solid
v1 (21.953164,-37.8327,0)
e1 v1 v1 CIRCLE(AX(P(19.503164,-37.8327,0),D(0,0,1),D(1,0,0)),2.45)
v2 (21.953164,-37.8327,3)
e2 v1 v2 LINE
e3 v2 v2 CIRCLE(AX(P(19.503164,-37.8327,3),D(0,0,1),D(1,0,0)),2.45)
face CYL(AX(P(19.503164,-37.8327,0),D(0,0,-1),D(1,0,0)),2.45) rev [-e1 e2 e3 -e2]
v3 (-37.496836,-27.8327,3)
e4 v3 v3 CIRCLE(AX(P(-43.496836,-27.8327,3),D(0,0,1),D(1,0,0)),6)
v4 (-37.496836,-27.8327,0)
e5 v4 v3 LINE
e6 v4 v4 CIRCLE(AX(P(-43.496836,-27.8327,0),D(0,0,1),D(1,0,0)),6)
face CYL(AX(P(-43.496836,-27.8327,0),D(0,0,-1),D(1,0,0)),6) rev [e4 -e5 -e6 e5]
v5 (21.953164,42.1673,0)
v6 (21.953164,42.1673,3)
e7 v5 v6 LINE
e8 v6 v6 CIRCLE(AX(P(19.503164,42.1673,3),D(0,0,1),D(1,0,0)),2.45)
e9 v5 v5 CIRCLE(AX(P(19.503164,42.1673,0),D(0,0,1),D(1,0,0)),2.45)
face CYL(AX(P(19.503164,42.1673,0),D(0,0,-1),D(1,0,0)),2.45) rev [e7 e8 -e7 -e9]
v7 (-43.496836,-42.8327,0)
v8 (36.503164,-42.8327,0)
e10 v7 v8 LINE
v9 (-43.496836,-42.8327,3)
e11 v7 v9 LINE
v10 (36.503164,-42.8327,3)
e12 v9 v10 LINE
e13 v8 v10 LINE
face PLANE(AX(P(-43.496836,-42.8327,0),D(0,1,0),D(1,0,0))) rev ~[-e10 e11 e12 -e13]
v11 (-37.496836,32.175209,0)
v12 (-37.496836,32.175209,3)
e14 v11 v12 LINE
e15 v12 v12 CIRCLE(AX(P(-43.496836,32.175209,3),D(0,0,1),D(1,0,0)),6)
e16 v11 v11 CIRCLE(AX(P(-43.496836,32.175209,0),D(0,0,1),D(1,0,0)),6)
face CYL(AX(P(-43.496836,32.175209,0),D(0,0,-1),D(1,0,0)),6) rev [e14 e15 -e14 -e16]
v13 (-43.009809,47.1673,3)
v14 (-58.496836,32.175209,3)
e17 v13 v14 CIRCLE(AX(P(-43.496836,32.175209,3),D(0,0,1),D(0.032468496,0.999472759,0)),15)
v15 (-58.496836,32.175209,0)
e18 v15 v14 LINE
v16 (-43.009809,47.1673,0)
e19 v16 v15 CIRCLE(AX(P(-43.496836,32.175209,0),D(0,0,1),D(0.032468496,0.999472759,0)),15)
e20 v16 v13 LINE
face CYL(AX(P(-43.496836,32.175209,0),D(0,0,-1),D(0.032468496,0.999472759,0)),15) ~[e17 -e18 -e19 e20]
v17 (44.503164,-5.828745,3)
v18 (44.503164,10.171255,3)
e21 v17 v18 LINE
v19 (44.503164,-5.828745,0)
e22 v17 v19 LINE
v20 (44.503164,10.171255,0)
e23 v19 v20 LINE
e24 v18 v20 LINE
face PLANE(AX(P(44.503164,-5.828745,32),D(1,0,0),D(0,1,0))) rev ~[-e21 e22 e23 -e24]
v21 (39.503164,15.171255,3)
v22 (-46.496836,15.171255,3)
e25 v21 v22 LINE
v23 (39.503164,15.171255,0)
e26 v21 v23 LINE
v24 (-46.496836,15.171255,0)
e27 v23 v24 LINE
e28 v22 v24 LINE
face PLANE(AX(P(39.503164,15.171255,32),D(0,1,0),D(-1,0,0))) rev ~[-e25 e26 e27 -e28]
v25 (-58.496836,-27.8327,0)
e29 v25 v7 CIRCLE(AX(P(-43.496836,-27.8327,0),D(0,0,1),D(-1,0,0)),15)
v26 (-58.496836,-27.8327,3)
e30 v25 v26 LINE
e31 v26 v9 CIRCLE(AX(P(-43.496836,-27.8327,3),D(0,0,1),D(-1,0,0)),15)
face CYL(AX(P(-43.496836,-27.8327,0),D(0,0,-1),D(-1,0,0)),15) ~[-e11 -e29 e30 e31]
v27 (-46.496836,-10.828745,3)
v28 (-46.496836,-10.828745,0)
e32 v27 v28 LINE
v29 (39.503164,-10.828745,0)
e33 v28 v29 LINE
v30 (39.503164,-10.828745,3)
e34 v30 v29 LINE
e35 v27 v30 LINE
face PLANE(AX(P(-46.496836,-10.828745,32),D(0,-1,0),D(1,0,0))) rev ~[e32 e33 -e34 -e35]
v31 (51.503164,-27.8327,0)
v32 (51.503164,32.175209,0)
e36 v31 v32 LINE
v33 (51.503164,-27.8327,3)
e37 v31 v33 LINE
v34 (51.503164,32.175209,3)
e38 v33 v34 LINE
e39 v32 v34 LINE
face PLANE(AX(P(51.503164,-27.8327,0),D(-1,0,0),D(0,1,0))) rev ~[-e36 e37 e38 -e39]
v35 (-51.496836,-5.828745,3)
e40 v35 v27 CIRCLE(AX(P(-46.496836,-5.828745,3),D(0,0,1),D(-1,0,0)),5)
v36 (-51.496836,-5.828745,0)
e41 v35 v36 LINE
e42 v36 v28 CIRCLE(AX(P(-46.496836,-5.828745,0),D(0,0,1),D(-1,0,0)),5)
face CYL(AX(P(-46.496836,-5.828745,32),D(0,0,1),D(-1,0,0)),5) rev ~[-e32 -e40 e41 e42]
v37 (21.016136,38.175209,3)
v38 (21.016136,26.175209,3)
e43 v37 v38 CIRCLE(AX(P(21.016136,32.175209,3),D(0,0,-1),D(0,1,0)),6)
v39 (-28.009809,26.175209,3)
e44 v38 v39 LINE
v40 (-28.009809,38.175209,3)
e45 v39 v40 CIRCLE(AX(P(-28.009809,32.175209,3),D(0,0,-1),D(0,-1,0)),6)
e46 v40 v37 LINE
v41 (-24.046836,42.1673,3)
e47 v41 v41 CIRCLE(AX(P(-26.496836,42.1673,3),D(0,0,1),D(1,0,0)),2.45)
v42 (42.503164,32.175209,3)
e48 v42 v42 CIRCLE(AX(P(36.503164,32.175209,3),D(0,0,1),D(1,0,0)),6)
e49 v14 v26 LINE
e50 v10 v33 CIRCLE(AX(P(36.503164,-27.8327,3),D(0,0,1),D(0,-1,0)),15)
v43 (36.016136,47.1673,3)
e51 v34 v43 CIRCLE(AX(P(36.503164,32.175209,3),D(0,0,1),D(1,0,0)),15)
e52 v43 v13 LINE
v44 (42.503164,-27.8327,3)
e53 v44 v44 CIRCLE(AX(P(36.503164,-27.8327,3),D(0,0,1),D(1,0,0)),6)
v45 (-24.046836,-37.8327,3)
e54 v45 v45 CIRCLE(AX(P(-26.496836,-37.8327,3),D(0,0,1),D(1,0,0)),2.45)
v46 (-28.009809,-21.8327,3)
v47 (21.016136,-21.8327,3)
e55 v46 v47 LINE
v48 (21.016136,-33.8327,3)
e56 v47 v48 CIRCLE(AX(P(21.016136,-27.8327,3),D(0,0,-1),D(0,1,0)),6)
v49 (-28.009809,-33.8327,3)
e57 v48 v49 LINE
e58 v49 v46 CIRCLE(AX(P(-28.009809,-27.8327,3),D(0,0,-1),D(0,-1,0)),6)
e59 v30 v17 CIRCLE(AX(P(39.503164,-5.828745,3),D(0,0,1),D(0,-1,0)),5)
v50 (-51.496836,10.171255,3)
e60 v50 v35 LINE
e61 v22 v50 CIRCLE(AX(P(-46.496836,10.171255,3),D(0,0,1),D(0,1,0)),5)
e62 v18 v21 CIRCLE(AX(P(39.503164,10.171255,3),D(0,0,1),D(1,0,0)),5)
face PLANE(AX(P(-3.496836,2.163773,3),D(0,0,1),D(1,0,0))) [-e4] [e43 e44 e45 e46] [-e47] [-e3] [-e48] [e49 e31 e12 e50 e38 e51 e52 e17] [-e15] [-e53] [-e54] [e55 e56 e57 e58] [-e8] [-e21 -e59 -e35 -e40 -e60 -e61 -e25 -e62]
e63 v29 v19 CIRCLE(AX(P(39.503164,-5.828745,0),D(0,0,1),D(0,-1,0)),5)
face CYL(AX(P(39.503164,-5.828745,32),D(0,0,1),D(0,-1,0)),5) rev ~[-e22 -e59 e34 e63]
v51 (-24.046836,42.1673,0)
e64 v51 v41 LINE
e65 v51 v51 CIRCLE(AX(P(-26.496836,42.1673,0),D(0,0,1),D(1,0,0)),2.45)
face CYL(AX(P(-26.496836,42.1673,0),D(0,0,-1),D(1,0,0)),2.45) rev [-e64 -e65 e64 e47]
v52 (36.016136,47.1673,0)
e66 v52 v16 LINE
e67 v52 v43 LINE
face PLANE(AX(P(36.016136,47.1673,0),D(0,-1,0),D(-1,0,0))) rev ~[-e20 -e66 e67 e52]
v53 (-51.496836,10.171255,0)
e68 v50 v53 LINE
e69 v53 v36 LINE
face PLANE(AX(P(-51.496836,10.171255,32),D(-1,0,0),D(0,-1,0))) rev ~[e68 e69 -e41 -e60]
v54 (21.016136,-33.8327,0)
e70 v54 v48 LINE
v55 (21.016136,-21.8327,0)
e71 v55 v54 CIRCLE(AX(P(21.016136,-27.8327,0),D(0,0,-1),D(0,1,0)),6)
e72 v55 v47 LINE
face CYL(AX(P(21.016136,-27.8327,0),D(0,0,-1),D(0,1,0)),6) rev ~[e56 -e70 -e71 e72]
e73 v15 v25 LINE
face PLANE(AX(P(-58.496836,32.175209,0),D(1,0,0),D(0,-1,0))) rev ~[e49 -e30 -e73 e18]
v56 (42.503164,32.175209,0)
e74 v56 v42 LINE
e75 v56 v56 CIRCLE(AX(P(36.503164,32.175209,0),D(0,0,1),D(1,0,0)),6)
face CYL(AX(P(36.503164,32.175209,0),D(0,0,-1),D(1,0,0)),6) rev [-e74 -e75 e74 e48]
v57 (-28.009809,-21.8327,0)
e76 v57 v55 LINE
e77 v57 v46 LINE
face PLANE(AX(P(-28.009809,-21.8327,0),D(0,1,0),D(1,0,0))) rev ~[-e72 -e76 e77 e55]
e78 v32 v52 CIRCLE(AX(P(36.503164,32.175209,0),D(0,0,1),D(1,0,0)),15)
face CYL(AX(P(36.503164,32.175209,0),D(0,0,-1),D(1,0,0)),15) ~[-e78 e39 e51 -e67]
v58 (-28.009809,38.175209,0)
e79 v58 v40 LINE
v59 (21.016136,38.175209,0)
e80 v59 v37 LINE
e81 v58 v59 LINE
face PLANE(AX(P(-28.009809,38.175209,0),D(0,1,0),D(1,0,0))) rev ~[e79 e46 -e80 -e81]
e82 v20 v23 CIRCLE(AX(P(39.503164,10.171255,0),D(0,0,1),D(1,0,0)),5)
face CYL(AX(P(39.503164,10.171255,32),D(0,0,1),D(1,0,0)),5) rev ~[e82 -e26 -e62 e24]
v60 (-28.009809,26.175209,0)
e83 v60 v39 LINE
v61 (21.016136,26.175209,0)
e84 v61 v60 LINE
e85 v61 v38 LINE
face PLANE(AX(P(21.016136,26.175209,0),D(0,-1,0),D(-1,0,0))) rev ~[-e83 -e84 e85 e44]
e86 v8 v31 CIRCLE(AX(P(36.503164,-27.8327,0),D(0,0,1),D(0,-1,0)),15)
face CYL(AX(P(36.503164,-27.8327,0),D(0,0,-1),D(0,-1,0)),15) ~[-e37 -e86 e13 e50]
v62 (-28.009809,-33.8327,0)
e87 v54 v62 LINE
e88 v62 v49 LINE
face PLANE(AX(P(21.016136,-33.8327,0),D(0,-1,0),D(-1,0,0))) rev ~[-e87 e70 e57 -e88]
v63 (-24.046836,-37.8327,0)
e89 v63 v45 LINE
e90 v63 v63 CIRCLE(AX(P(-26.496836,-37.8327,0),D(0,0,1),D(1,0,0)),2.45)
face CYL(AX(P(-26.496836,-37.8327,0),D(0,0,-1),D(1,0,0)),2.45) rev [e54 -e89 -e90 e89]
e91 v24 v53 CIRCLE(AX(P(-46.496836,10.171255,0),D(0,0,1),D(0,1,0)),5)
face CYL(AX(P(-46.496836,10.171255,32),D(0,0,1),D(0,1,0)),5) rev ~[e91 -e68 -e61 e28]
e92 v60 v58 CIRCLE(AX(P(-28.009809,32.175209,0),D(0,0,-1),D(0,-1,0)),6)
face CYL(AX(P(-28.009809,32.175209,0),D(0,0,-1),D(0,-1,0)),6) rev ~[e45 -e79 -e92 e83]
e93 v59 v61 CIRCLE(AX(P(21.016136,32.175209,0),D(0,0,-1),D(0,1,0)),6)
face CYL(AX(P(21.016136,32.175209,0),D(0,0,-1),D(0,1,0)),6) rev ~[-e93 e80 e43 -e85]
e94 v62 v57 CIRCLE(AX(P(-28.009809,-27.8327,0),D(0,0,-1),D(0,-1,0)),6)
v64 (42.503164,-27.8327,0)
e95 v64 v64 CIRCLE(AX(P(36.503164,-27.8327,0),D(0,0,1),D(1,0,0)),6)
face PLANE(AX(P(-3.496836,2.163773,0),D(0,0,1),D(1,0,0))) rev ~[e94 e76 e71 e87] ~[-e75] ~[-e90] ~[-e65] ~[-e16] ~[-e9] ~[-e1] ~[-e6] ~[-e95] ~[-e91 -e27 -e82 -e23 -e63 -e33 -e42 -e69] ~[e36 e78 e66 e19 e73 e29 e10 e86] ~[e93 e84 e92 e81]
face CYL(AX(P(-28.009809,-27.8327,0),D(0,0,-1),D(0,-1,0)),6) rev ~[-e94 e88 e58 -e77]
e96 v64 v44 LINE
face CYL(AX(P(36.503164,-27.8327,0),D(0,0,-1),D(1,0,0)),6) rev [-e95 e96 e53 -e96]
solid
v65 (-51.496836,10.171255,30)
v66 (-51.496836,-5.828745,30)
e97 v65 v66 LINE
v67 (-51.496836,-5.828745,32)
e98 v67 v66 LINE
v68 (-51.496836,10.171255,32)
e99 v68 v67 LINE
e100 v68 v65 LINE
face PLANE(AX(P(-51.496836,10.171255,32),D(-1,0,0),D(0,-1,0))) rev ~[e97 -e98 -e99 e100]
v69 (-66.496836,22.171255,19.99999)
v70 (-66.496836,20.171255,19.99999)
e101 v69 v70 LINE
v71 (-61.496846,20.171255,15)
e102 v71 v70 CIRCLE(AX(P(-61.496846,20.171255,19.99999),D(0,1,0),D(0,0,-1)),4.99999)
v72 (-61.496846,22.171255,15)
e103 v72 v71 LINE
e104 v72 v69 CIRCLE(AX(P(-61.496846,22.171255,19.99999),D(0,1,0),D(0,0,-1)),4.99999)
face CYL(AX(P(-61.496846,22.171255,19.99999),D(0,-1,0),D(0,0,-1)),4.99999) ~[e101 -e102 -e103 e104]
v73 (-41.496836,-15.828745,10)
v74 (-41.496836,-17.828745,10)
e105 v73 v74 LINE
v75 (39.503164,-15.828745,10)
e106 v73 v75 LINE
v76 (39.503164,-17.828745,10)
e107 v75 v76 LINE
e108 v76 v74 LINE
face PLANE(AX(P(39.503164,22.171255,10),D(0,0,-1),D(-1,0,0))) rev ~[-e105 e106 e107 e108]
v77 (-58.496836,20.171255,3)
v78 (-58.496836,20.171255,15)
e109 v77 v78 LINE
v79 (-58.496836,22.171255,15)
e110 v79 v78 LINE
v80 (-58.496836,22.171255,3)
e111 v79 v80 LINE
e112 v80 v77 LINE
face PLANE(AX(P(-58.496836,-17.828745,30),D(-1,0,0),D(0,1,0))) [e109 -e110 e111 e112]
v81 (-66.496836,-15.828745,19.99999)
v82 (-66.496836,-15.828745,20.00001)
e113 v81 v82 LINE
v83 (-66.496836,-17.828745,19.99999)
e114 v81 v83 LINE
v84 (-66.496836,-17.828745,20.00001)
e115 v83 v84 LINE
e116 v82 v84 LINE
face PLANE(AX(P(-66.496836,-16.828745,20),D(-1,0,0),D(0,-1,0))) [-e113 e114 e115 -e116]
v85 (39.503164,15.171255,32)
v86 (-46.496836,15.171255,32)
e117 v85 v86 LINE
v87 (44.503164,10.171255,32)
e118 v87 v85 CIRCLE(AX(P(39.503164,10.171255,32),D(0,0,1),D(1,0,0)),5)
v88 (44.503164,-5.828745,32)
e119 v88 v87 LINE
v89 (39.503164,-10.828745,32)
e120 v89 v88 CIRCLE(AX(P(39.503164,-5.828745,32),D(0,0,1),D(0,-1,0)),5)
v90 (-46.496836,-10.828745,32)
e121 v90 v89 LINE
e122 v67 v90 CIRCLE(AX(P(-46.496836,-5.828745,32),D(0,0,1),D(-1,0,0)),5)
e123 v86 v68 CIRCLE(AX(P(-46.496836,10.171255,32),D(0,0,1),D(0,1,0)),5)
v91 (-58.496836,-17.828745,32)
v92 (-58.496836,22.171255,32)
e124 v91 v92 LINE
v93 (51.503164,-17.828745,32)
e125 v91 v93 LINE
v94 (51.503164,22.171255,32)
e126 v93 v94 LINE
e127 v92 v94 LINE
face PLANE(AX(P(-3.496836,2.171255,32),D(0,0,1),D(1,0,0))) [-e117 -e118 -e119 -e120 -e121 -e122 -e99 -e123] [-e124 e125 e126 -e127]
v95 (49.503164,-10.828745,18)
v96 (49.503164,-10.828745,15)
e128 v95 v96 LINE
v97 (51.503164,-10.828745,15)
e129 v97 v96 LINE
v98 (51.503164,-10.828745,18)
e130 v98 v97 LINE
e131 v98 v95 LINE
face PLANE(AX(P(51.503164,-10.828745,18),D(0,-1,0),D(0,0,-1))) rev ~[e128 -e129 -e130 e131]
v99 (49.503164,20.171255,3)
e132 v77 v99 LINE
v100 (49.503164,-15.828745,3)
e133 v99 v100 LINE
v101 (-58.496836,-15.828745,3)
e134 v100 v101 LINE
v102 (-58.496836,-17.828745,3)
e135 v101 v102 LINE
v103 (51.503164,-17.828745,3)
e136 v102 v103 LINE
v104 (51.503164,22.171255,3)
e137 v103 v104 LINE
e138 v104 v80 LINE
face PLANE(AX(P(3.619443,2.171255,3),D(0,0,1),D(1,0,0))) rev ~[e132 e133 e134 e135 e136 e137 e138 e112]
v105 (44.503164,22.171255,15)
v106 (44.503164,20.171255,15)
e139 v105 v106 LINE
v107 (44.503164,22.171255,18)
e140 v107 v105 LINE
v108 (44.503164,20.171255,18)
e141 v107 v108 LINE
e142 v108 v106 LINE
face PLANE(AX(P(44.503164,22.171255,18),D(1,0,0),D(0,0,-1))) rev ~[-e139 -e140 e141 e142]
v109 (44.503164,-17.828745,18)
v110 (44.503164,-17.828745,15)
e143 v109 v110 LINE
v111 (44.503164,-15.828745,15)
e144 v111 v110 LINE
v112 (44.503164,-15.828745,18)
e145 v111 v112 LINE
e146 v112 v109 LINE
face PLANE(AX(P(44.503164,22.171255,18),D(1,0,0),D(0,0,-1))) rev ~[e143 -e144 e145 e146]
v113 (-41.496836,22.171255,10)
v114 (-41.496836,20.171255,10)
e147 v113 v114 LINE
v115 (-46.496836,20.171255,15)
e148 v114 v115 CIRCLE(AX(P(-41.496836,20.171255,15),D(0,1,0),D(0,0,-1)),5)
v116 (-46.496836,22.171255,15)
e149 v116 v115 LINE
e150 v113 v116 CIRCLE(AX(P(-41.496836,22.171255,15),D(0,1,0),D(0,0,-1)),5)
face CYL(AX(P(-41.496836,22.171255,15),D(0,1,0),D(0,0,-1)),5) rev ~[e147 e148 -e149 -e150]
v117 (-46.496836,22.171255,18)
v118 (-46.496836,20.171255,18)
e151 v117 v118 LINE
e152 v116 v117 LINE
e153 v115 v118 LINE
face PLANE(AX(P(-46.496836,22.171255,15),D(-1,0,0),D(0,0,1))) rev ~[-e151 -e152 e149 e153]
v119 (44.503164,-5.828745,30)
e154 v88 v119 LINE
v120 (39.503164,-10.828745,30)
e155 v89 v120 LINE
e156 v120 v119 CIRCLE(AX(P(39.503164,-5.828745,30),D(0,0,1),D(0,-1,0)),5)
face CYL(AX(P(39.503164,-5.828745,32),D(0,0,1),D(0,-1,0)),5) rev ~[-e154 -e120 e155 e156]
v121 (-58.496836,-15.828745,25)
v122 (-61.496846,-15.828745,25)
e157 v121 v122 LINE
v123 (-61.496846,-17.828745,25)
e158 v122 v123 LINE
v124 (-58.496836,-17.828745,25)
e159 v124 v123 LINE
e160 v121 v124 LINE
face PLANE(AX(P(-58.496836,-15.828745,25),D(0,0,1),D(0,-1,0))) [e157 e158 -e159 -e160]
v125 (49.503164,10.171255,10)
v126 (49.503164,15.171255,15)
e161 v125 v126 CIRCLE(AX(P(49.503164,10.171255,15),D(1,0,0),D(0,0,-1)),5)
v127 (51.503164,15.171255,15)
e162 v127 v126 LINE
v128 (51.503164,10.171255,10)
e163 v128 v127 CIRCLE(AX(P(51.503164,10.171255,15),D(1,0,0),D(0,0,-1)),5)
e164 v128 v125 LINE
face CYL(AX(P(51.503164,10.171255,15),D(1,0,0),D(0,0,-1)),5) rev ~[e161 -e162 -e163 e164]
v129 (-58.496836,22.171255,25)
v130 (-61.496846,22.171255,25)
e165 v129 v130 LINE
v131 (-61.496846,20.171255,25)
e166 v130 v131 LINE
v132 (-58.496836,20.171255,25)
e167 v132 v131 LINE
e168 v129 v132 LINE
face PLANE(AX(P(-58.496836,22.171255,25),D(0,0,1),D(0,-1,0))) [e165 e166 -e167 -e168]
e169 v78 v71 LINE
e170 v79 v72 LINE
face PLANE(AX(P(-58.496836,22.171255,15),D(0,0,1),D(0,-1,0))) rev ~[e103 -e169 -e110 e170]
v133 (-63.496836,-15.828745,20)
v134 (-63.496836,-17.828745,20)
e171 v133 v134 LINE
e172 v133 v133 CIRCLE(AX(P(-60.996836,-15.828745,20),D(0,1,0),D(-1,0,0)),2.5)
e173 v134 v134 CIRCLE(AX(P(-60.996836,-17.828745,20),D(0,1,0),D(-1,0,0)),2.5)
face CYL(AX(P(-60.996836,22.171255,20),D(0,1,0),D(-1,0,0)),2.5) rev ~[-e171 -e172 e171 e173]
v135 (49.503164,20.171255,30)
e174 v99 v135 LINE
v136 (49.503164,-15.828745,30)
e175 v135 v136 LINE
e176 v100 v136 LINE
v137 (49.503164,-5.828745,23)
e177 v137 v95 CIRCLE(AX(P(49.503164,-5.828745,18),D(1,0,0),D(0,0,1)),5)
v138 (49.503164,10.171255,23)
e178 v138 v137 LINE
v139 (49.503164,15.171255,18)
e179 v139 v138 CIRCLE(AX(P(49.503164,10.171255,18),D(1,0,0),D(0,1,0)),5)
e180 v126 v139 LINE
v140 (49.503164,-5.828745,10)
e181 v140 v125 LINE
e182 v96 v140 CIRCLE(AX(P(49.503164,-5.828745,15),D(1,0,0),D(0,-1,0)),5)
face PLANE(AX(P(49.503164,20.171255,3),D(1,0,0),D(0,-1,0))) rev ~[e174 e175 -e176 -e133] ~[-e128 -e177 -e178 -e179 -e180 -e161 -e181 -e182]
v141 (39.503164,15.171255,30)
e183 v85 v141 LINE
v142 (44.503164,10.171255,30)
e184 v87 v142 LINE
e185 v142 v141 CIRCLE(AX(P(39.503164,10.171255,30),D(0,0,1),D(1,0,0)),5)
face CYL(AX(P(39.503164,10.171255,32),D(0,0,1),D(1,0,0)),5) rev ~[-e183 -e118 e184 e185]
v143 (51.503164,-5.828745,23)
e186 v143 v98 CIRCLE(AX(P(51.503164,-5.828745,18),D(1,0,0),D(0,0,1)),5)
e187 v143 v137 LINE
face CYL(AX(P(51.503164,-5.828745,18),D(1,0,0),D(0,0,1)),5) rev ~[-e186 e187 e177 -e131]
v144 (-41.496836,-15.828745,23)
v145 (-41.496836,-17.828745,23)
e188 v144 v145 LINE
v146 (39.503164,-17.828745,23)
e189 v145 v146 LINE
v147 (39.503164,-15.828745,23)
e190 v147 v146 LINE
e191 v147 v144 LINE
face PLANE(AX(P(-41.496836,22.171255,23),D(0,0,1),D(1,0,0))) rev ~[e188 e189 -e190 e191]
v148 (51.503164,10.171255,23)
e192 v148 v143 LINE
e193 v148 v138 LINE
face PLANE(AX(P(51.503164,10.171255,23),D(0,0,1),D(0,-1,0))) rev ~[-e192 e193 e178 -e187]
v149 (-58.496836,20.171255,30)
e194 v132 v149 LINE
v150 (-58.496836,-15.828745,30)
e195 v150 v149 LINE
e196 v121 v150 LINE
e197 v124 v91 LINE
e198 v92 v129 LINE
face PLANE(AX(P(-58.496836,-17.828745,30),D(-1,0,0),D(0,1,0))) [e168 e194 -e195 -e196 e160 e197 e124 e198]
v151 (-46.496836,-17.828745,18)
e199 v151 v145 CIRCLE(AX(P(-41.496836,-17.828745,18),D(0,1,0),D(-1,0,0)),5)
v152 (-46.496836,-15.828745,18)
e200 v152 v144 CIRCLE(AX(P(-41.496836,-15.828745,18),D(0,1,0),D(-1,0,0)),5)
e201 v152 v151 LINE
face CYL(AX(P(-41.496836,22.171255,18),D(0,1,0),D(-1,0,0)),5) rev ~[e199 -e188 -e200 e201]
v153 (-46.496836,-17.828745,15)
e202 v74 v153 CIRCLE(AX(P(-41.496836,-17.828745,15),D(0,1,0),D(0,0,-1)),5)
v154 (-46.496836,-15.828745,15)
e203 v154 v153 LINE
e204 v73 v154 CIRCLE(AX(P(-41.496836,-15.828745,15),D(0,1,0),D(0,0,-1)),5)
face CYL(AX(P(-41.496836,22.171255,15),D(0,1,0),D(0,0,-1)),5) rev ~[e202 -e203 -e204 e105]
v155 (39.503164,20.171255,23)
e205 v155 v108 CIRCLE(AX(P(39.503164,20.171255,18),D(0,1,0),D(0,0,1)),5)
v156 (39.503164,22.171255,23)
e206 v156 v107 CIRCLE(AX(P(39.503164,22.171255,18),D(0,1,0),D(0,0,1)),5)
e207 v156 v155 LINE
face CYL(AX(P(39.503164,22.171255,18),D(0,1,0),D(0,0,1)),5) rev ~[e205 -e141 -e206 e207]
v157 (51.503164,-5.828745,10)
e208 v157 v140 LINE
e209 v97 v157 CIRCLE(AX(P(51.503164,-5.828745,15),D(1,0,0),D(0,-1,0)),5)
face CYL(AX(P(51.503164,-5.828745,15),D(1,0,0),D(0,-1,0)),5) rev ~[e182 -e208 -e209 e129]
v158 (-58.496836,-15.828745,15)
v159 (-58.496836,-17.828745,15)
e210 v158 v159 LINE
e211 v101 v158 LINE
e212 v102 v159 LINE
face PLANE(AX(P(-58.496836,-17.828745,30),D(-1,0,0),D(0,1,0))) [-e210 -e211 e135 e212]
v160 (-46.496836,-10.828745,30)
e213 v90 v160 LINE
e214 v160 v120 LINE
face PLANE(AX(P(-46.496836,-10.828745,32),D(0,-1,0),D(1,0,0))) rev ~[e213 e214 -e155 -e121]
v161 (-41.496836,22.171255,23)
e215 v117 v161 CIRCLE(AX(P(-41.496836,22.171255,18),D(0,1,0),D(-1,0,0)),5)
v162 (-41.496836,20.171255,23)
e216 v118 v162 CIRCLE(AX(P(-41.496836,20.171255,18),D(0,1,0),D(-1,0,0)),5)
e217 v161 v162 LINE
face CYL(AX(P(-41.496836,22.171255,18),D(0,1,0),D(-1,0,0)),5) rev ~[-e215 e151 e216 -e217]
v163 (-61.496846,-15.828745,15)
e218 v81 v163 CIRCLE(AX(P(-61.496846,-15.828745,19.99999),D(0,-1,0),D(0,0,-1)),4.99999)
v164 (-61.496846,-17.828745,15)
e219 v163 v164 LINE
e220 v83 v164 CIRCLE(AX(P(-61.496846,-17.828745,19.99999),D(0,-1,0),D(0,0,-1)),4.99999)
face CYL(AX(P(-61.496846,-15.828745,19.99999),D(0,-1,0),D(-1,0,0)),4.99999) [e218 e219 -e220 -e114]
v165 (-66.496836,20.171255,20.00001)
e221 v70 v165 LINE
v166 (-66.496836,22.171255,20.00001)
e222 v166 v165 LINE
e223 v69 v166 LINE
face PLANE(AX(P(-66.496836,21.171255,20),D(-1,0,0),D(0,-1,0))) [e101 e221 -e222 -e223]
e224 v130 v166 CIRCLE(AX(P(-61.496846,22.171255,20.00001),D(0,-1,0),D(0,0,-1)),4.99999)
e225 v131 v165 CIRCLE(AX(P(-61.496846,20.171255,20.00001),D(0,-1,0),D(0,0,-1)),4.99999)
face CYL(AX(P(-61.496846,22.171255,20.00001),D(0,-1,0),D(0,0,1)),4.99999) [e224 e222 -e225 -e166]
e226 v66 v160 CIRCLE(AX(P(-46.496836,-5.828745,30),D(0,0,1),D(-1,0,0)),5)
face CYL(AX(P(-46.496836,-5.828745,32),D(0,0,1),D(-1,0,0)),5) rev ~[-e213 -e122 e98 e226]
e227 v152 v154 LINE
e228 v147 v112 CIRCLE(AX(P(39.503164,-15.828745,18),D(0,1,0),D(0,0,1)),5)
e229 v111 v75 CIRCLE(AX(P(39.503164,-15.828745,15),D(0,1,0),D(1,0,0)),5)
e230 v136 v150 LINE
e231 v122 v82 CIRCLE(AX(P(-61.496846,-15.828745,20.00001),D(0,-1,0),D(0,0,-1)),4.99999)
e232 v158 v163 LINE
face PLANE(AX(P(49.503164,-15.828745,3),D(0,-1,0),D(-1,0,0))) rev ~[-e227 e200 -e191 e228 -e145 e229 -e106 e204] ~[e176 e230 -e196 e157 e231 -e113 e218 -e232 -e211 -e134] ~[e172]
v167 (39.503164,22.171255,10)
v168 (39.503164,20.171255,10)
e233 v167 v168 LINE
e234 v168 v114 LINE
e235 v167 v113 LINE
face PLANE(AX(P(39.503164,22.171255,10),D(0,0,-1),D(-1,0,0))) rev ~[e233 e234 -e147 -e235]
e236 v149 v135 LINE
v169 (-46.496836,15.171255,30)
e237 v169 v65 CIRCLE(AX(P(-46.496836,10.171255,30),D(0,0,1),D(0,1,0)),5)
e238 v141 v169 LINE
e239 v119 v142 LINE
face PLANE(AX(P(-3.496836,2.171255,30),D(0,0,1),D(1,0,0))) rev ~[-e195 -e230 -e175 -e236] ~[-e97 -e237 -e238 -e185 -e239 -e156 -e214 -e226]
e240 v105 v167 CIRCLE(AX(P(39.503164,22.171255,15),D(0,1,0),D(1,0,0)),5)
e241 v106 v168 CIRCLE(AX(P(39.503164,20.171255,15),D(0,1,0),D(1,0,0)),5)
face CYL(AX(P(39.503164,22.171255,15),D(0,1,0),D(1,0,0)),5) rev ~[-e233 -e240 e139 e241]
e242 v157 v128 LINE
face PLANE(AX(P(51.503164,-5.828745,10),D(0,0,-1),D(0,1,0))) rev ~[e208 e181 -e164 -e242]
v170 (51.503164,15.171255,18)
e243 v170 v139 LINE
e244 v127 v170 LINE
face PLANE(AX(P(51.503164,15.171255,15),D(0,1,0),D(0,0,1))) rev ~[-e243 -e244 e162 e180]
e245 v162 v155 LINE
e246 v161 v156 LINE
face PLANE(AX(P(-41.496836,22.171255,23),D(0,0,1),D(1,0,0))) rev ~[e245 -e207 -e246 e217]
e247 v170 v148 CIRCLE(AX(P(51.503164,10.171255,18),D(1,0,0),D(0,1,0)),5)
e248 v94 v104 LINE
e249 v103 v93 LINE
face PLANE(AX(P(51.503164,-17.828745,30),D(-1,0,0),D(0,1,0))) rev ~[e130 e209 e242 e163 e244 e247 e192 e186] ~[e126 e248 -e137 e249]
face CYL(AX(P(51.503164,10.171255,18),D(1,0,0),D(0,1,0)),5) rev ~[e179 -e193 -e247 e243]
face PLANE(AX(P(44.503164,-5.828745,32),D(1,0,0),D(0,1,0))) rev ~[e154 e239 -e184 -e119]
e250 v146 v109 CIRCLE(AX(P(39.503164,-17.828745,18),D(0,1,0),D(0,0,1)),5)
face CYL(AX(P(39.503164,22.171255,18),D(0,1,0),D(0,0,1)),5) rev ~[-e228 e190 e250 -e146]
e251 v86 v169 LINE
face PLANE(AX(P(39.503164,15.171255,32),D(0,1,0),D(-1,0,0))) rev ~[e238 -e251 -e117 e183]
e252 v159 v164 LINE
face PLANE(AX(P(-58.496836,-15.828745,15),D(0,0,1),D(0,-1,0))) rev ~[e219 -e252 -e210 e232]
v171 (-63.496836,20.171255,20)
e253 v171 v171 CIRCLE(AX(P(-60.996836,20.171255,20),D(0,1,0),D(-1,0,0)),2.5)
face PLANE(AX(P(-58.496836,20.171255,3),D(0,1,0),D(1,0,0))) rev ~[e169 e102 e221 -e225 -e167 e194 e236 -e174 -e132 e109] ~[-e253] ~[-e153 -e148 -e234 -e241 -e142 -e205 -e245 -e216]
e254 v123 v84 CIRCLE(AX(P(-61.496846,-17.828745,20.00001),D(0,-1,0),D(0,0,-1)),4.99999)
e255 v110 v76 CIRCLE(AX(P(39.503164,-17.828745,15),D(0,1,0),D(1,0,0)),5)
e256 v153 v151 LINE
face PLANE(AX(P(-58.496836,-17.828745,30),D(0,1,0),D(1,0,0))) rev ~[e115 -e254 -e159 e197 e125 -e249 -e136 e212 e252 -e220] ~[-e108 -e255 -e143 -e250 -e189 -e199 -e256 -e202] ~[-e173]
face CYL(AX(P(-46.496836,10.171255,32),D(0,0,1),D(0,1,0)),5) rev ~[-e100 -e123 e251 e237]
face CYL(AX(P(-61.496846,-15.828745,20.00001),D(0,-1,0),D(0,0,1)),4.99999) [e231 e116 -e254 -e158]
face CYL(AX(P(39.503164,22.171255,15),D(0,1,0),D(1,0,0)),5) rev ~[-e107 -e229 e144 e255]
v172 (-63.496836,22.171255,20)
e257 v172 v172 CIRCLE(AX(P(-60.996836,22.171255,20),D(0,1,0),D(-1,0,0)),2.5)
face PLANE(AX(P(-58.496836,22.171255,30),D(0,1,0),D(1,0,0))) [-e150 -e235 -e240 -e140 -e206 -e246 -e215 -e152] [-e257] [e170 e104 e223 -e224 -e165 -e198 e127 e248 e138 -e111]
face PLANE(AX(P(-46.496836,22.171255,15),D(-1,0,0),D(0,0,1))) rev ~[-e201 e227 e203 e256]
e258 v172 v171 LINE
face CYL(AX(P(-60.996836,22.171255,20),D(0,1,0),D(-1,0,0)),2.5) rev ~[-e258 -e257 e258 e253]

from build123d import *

# Parameters (mm, degrees)
F0_R      = 6
F0_R_2    = 2.45
F1_DEPTH  = 3
F3_DEPTH  = 27
F5_DEPTH  = 25
F7_DEPTH  = 100
F8_W      = 110
F8_H      = 40
F9_DEPTH  = 2
F11_DEPTH = 50
F12_W     = 2
F12_H     = 10
F13_DEPTH = 8
F14_R     = 2.5
F15_DEPTH = 50
F16_R     = 4.99999


# Not quite as in the source:
# - a fillet or chamfer is up to 0.001 mm smaller than in the source, because OpenCascade refuses the exact size


with BuildPart() as f1:
    # F0 (on Top) → F1 (new body)
    with BuildSketch(Plane.XY):
        with BuildLine():
            Line((36.0161362187, 47.167300203), (-43.0098088973, 47.167300203))
            ThreePointArc((-43.0098088973, 47.167300203), (-53.9298270028, 42.9526252844), (-58.4968363393, 32.1752088122))
            Line((-58.4968363393, 32.1752088122), (-58.4968363393, -27.832699797))
            ThreePointArc((-58.4968363393, -27.832699797), (-54.1034380571, -38.4393015148), (-43.4968363393, -42.832699797))
            Line((-43.4968363393, -42.832699797), (36.5031636607, -42.832699797))
            ThreePointArc((36.5031636607, -42.832699797), (47.1097653785, -38.4393015148), (51.5031636607, -27.832699797))
            Line((51.5031636607, -27.832699797), (51.5031636607, 32.1752088122))
            ThreePointArc((51.5031636607, 32.1752088122), (46.9361543242, 42.9526252844), (36.0161362187, 47.167300203))
        make_face()
        with Locations((-43.4968363393, -27.832699797)):
            Circle(F0_R, mode=Mode.SUBTRACT)
        with Locations((-26.4968363393, -37.832699797)):
            Circle(F0_R_2, mode=Mode.SUBTRACT)
        with BuildLine():
            ThreePointArc((-28.0098088973, -33.832699797), (-34.0098088973, -27.832699797), (-28.0098088973, -21.832699797))
            Line((-28.0098088973, -21.832699797), (21.0161362187, -21.832699797))
            ThreePointArc((21.0161362187, -21.832699797), (27.0161362187, -27.832699797), (21.0161362187, -33.832699797))
            Line((21.0161362187, -33.832699797), (-28.0098088973, -33.832699797))
        make_face(mode=Mode.SUBTRACT)
        with Locations((19.5031636607, -37.832699797)):
            Circle(F0_R_2, mode=Mode.SUBTRACT)
        with Locations((36.5031636607, -27.832699797)):
            Circle(F0_R, mode=Mode.SUBTRACT)
        with Locations((-43.4968363393, 32.1752088122)):
            Circle(F0_R, mode=Mode.SUBTRACT)
        with BuildLine():
            ThreePointArc((-28.0098088973, 26.1752088122), (-34.0098088973, 32.1752088122), (-28.0098088973, 38.1752088122))
            Line((-28.0098088973, 38.1752088122), (21.0161362187, 38.1752088122))
            ThreePointArc((21.0161362187, 38.1752088122), (27.0161362187, 32.1752088122), (21.0161362187, 26.1752088122))
            Line((21.0161362187, 26.1752088122), (-28.0098088973, 26.1752088122))
        make_face(mode=Mode.SUBTRACT)
        with Locations((-26.4968363393, 42.167300203)):
            Circle(F0_R_2, mode=Mode.SUBTRACT)
        with Locations((19.5031636607, 42.167300203)):
            Circle(F0_R_2, mode=Mode.SUBTRACT)
        with Locations((36.5031636607, 32.1752088122)):
            Circle(F0_R, mode=Mode.SUBTRACT)
    extrude(amount=F1_DEPTH)


with BuildPart() as f3:
    # F2 (on face) → F3 (new body)
    with BuildSketch(Plane.XY.offset(3)):
        Polygon((-58.4968363393, 22.1712545076), (-58.4968363393, 20.1712545076), (49.5031636607, 20.1712545076), (49.5031636607, -15.8287454924), (-58.4968363393, -15.8287454924), (-58.4968363393, -17.8287454924), (51.5031636607, -17.8287454924), (51.5031636607, -15.8287454924), (51.5031636607, 20.1712545076), (51.5031636607, 22.1712545076), align=None)
    extrude(amount=F3_DEPTH)

    # F4 (on face) → F5 (cut)
    with BuildSketch(Plane.YZ.offset(51.5031636607)):
        with BuildLine():
            Line((10.1712545076, 23), (-5.8287454924, 23))
            ThreePointArc((-5.8287454924, 23), (-9.3642793983, 21.5355339059), (-10.8287454924, 18))
            Line((-10.8287454924, 18), (-10.8287454924, 15))
            ThreePointArc((-10.8287454924, 15), (-9.3642793983, 11.4644660941), (-5.8287454924, 10))
            Line((-5.8287454924, 10), (10.1712545076, 10))
            ThreePointArc((10.1712545076, 10), (13.7067884136, 11.4644660941), (15.1712545076, 15))
            Line((15.1712545076, 15), (15.1712545076, 18))
            ThreePointArc((15.1712545076, 18), (13.7067884136, 21.5355339059), (10.1712545076, 23))
        make_face()
    extrude(amount=-F5_DEPTH, mode=Mode.SUBTRACT)

    # F6 (on face) → F7 (cut)
    with BuildSketch(Plane(origin=(0, 22.1712545076, 0), x_dir=(-1, 0, 0), z_dir=(0, 1, 0))):
        with BuildLine():
            Line((41.4968363393, 23), (-39.5031636607, 23))
            ThreePointArc((-39.5031636607, 23), (-43.0386975666, 21.5355339059), (-44.5031636607, 18))
            Line((-44.5031636607, 18), (-44.5031636607, 15))
            ThreePointArc((-44.5031636607, 15), (-43.0386975666, 11.4644660941), (-39.5031636607, 10))
            Line((-39.5031636607, 10), (41.4968363393, 10))
            ThreePointArc((41.4968363393, 10), (45.0323702452, 11.4644660941), (46.4968363393, 15))
            Line((46.4968363393, 15), (46.4968363393, 18))
            ThreePointArc((46.4968363393, 18), (45.0323702452, 21.5355339059), (41.4968363393, 23))
        make_face()
    extrude(amount=-F7_DEPTH, mode=Mode.SUBTRACT)

    # F8 (on face) → F9 (join)
    with BuildSketch(Plane.XY.offset(30)):
        with Locations((-3.4968363393, 2.1712545076)):
            Rectangle(F8_W, F8_H)
    extrude(amount=F9_DEPTH)


with BuildPart() as f11_tool:
    # F10 (on face) → F11 (new body)
    with BuildSketch(Plane.XY.offset(32)):
        with BuildLine():
            Line((39.5031636607, 15.1712545076), (-46.4968363393, 15.1712545076))
            ThreePointArc((-46.4968363393, 15.1712545076), (-50.0323702452, 13.7067884136), (-51.4968363393, 10.1712545076))
            Line((-51.4968363393, 10.1712545076), (-51.4968363393, -5.8287454924))
            ThreePointArc((-51.4968363393, -5.8287454924), (-50.0323702452, -9.3642793983), (-46.4968363393, -10.8287454924))
            Line((-46.4968363393, -10.8287454924), (39.5031636607, -10.8287454924))
            ThreePointArc((39.5031636607, -10.8287454924), (43.0386975666, -9.3642793983), (44.5031636607, -5.8287454924))
            Line((44.5031636607, -5.8287454924), (44.5031636607, 10.1712545076))
            ThreePointArc((44.5031636607, 10.1712545076), (43.0386975666, 13.7067884136), (39.5031636607, 15.1712545076))
        make_face()
    extrude(amount=-F11_DEPTH)


with BuildPart() as f1_1:
    add(f1.part)

    # F11: cut by f11_tool
    add(f11_tool.part, mode=Mode.SUBTRACT)


with BuildPart() as f3_1:
    add(f3.part)

    # F11: cut by f11_tool
    add(f11_tool.part, mode=Mode.SUBTRACT)

    # F12 (on face) → F13 (join)
    with BuildSketch(Plane(origin=(-58.4968363393, 0, 0), x_dir=(0, -1, 0), z_dir=(-1, 0, 0))):
        with Locations((-21.1712545076, 20)):
            Rectangle(F12_W, F12_H)
        with Locations((16.8287454924, 20)):
            Rectangle(F12_W, F12_H)
    extrude(amount=F13_DEPTH)

    # F14 (on face) → F15 (cut)
    with BuildSketch(Plane(origin=(0, 22.1712545076, 0), x_dir=(-1, 0, 0), z_dir=(0, 1, 0))):
        with Locations((60.9968363393, 20)):
            Circle(F14_R)
    extrude(amount=-F15_DEPTH, mode=Mode.SUBTRACT)

    # F16 (radius 5 in the source; OpenCascade refuses exactly that, so slightly less here)
    f16_edges = [f3_1.edges().sort_by_distance(p)[0] for p in [
        (-66.496836, -16.828745, 25),
        (-66.496836, -16.828745, 15),
        (-66.496836, 21.171255, 15),
        (-66.496836, 21.171255, 25),
    ]]
    fillet(f16_edges, radius=F16_R)


solid = Compound([f1_1.part, f3_1.part])
